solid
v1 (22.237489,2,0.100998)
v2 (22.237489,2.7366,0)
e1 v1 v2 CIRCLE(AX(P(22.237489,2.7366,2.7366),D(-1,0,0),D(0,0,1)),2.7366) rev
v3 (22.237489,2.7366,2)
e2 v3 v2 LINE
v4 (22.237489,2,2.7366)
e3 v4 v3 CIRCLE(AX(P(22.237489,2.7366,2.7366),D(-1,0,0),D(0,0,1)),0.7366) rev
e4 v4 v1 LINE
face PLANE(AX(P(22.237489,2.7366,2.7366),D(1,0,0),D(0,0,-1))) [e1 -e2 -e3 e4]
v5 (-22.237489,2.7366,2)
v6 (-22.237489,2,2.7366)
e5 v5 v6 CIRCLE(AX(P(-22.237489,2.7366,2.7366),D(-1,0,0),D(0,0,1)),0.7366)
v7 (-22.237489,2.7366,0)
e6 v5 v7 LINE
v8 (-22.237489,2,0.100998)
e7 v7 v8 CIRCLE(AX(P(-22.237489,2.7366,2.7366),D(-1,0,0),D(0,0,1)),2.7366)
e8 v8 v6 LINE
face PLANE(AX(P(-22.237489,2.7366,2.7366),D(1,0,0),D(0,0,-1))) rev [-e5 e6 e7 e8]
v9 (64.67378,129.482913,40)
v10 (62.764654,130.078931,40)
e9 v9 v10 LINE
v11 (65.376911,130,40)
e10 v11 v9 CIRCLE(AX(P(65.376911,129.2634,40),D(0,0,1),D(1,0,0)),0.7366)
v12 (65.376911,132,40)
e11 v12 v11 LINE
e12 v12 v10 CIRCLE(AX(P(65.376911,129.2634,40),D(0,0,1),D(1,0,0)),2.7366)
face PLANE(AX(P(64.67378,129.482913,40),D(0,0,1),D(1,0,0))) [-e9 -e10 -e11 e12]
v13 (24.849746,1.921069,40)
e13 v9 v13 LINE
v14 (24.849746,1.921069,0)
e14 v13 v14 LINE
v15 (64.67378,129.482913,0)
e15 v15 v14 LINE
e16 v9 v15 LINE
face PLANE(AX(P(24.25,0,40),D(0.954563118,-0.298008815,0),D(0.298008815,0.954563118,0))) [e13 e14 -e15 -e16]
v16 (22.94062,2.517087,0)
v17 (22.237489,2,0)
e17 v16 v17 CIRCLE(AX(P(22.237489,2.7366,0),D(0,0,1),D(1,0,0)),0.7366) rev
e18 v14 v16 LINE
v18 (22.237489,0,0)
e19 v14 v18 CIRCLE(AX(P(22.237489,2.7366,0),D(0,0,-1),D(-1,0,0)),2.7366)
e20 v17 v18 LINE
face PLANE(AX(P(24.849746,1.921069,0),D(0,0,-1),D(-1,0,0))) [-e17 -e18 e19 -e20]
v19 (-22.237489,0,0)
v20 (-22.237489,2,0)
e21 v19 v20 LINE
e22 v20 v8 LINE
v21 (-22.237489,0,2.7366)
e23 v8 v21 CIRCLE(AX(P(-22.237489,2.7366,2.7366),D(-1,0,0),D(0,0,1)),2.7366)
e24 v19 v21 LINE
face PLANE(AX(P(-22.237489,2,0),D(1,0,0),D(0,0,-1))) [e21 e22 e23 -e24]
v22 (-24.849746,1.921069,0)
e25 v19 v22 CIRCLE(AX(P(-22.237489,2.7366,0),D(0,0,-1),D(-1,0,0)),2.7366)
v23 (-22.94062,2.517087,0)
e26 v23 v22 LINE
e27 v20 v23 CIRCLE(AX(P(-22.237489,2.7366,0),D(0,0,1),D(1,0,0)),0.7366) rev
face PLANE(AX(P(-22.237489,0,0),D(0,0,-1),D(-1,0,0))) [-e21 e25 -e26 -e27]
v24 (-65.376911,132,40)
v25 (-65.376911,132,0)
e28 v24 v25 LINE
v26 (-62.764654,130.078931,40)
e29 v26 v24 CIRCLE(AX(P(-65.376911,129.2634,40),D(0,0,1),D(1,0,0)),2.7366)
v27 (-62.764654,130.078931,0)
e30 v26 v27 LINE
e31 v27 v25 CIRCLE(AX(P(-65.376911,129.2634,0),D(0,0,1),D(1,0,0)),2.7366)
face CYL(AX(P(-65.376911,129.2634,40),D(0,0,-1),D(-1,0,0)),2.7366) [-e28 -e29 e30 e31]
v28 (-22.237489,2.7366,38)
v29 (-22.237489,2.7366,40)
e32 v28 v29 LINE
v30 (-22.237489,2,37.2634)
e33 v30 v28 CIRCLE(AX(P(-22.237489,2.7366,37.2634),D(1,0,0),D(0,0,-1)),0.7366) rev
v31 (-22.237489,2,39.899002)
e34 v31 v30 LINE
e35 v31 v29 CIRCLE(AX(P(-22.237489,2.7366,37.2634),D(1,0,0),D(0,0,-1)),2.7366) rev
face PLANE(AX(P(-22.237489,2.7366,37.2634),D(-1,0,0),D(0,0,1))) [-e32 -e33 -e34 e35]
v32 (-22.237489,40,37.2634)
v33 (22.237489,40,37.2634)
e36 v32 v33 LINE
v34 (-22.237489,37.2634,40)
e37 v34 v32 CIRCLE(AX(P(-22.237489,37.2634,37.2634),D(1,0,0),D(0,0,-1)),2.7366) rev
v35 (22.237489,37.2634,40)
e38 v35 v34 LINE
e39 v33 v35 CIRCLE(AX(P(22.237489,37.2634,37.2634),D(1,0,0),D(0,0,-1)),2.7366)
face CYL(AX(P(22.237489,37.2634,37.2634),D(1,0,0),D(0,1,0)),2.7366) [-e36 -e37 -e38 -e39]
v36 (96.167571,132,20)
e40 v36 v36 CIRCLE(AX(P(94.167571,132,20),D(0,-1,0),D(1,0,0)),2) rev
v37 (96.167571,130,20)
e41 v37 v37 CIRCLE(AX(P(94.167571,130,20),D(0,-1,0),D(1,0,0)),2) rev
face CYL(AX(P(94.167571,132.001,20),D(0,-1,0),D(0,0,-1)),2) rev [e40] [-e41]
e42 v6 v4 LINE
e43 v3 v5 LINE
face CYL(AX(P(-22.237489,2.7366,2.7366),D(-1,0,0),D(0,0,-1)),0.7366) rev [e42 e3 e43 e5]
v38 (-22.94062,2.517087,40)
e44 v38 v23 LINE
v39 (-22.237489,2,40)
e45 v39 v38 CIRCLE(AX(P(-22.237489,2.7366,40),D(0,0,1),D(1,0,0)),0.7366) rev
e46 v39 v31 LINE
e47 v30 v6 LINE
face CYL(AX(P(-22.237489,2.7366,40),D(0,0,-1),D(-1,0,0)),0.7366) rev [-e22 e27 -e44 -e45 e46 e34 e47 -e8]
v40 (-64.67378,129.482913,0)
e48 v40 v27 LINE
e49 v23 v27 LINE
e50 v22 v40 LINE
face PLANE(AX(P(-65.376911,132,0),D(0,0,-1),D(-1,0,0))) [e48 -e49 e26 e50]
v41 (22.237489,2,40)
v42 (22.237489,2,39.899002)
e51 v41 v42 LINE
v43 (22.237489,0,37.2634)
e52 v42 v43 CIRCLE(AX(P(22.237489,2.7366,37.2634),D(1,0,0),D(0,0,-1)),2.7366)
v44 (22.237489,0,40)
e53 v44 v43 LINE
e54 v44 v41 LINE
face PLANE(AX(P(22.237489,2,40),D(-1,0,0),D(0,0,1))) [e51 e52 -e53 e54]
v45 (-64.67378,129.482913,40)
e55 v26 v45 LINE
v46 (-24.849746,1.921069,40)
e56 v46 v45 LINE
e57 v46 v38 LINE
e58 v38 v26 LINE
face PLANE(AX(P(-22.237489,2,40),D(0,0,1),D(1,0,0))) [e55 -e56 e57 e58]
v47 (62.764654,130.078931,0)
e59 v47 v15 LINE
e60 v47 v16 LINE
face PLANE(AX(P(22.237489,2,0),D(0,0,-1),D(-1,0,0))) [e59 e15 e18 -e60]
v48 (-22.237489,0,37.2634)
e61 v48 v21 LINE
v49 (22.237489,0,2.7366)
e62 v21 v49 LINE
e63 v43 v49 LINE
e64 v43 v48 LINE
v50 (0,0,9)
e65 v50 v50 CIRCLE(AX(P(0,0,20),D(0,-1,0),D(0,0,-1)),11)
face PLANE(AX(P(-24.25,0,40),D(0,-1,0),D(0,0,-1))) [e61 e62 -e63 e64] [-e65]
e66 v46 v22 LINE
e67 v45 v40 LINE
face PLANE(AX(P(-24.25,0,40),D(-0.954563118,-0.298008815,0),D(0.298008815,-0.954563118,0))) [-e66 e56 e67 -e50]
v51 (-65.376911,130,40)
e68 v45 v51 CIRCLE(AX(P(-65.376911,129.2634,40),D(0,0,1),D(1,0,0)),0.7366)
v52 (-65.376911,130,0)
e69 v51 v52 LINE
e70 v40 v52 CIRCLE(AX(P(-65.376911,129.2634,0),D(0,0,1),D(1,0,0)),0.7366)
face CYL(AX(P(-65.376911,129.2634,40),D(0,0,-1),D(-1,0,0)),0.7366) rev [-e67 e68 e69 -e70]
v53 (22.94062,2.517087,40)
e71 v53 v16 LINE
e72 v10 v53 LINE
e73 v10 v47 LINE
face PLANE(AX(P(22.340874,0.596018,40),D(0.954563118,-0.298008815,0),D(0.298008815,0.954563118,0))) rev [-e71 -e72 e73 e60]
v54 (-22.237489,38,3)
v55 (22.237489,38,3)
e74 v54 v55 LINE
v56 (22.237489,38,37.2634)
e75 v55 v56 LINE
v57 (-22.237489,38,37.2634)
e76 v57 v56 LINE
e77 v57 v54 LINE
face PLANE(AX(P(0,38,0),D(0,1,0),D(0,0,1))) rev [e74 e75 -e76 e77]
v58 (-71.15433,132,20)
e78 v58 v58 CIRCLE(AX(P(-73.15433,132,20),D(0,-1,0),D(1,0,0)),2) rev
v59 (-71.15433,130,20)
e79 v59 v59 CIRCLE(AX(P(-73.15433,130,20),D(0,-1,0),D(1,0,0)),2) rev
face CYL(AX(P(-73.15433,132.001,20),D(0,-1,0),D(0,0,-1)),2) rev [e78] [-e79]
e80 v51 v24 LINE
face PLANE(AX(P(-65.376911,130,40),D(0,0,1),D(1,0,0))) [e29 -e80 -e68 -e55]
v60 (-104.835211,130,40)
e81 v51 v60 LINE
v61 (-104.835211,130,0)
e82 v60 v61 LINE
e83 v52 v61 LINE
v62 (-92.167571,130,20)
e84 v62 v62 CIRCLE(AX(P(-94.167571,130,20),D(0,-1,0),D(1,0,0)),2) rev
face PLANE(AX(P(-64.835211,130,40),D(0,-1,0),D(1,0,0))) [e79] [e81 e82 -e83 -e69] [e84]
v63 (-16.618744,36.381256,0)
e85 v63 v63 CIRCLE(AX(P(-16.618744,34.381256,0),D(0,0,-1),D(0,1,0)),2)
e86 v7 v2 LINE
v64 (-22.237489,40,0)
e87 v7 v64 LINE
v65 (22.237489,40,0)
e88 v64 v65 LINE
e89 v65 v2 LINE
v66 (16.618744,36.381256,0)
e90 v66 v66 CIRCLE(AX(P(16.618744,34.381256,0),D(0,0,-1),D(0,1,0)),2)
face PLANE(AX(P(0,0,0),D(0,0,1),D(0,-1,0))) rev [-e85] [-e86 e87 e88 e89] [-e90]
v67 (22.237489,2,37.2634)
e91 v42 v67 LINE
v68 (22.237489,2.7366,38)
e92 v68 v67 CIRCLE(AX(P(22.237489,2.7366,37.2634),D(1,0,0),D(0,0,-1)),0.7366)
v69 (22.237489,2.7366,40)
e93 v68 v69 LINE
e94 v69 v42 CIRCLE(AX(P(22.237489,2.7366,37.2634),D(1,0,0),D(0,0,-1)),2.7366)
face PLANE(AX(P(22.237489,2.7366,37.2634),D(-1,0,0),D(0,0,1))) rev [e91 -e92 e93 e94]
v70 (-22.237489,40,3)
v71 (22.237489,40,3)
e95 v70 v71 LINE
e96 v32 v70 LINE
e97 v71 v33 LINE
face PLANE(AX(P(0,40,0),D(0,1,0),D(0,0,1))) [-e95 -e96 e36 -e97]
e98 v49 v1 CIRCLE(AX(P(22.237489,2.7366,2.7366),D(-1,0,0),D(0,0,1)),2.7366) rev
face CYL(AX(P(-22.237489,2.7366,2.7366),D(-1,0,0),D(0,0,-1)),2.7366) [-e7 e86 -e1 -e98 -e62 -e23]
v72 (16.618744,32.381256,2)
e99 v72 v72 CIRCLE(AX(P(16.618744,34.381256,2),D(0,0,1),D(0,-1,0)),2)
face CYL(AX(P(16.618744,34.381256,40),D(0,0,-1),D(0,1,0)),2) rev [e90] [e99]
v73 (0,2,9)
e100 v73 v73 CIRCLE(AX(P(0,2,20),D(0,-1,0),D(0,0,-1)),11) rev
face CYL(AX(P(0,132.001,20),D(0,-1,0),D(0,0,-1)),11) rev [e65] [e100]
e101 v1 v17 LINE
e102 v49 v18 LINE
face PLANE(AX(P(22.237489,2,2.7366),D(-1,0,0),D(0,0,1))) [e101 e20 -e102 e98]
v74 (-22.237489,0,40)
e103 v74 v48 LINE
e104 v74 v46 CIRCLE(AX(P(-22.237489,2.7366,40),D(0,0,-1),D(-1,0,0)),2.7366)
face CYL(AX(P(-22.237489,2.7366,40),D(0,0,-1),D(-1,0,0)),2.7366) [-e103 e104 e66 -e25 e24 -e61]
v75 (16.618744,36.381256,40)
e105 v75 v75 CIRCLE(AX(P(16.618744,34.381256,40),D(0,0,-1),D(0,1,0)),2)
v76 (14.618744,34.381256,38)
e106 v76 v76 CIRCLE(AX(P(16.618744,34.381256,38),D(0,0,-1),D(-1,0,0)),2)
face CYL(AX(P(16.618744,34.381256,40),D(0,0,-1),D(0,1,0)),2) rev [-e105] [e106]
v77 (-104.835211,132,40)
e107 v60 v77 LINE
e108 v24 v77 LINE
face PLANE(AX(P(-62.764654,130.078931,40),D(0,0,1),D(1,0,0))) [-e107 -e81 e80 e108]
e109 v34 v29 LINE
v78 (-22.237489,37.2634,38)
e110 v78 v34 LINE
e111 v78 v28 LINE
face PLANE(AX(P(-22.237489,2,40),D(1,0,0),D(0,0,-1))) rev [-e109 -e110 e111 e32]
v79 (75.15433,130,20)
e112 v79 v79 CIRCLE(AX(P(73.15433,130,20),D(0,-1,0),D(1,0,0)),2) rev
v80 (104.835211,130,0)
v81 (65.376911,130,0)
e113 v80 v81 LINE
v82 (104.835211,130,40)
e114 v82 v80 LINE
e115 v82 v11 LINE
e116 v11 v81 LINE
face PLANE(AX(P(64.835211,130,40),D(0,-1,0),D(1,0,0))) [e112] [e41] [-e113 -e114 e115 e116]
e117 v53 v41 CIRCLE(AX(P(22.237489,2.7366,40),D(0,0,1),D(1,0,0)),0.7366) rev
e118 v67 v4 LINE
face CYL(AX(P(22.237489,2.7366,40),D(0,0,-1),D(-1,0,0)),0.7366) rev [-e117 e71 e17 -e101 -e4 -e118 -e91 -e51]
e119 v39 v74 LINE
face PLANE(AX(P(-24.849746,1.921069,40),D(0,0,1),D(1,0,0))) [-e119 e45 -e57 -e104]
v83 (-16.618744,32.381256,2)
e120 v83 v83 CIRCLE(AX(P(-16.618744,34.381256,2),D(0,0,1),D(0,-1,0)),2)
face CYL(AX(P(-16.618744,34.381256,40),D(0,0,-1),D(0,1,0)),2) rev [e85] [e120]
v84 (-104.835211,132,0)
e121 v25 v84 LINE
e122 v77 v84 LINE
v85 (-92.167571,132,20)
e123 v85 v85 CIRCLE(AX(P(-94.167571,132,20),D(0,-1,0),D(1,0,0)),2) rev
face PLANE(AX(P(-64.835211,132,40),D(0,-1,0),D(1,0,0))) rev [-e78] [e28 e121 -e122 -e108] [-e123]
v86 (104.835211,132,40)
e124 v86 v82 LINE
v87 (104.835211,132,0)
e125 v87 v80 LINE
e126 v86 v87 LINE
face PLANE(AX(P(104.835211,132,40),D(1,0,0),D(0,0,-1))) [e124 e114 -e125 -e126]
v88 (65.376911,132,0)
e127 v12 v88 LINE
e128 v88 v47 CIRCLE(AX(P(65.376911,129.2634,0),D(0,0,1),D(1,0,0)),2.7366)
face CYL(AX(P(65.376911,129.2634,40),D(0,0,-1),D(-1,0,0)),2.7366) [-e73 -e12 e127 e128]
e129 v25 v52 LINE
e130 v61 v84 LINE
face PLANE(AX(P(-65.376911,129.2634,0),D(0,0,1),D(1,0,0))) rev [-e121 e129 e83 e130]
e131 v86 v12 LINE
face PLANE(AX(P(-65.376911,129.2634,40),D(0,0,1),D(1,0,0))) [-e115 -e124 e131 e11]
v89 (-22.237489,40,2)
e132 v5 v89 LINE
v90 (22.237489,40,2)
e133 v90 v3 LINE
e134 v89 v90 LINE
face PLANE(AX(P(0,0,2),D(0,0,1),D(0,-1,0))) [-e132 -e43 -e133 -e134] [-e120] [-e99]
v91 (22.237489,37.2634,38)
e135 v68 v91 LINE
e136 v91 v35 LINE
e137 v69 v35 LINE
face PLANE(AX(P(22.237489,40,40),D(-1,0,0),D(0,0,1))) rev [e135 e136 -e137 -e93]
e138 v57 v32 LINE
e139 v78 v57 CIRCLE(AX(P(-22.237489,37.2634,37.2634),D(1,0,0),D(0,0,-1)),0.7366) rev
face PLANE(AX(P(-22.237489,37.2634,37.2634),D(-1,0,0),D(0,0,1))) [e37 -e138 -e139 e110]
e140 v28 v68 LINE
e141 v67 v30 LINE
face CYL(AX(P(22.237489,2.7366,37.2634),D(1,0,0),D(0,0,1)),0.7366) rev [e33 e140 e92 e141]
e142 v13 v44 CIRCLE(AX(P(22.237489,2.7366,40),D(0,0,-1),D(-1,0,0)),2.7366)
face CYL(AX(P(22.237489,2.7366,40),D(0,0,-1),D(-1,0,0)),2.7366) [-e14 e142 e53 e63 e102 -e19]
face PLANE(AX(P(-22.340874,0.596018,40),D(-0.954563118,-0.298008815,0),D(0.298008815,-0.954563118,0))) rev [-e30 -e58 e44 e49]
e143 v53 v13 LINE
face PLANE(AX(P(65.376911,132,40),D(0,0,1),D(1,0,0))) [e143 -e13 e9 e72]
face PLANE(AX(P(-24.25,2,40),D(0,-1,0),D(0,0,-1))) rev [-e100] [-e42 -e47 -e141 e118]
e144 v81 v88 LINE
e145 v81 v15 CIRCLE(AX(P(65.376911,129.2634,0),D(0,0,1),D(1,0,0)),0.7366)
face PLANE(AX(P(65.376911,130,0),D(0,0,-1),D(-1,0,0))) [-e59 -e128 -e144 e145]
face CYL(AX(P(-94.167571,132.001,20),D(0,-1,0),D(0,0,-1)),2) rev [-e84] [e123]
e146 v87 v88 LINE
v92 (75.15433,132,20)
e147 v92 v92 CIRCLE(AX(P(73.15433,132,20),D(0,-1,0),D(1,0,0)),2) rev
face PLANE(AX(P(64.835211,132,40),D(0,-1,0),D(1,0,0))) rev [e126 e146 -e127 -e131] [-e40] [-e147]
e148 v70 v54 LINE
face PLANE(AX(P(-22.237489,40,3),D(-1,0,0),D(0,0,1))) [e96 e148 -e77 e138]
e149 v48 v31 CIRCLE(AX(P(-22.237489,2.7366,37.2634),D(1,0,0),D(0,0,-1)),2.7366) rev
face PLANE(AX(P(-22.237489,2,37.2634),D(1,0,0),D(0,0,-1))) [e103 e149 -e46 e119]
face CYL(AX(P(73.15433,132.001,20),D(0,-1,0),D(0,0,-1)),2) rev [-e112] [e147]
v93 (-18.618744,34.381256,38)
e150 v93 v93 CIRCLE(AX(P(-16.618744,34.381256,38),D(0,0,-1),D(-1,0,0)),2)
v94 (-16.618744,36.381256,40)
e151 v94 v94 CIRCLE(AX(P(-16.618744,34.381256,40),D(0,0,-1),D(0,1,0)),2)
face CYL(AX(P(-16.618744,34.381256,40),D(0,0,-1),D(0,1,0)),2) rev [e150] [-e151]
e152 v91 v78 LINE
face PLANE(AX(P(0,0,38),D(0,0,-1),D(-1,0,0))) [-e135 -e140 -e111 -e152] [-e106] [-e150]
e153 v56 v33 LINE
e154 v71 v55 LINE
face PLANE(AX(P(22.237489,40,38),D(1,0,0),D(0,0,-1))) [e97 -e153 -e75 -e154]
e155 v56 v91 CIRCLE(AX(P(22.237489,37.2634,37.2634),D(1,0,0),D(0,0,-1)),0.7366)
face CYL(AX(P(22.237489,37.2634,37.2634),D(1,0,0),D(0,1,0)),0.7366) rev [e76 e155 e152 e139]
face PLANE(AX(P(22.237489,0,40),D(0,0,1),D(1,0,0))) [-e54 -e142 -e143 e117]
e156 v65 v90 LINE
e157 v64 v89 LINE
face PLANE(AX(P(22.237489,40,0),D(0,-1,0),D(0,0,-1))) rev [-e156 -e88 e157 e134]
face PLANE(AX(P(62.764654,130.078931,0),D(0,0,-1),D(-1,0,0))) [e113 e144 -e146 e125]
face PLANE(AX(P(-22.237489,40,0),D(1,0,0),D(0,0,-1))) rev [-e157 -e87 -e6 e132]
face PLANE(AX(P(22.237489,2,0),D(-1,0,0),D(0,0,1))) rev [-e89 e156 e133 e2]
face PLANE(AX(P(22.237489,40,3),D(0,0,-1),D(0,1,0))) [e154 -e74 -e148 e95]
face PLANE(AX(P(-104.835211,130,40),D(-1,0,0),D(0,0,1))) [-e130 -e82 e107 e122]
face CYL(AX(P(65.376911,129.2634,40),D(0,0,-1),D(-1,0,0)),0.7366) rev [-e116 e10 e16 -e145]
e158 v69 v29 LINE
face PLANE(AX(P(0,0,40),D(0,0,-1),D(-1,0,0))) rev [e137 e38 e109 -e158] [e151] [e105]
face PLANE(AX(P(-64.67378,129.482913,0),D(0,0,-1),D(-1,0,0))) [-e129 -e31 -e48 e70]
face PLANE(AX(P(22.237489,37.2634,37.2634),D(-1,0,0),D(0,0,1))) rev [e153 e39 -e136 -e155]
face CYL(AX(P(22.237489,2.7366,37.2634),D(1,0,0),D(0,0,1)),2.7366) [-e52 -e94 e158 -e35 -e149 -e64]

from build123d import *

# Parameters (mm, degrees)
BASE_FLANGE1_DEPTH           = 40
EDGE_FLANGE1_STRIP_W         = 9.4732
EDGE_FLANGE1_STRIP_H         = 2
EDGE_FLANGE1_STRIP_CUT_DEPTH = 44.47497737
EDGE_FLANGE1_DEPTH           = 44.47497737
EDGE_FLANGE2_STRIP_W         = 9.4732
EDGE_FLANGE2_STRIP_H         = 2
EDGE_FLANGE2_STRIP_CUT_DEPTH = 44.47497737
EDGE_FLANGE2_DEPTH           = 44.47497737
EDGE_FLANGE3_STRIP_W         = 9.4732
EDGE_FLANGE3_STRIP_H         = 2
EDGE_FLANGE3_STRIP_CUT_DEPTH = 44.47497737
EDGE_FLANGE3_DEPTH           = 44.47497737
CUT_EXTRUDE1_REACH           = 175.247
SKETCH28_R                   = 11
SKETCH28_R_2                 = 2
SKETCH29_R                   = 2
CUT_EXTRUDE2_DEPTH           = 174.246707232


# Sheet-metal steps are written as plain solids
with BuildPart() as part:
    # Sketch1 → Base-Flange1 (new body)
    with BuildSketch(Plane.XY):
        with BuildLine():
            Line((104.835211483, 130), (65.376911342, 130))
            ThreePointArc((65.376911342, 130), (64.940513549, 129.856810925), (64.67378015, 129.482913293))
            Line((64.67378015, 129.482913293), (24.849746113, 1.921069076))
            ThreePointArc((24.849746113, 1.921069076), (23.858784098, 0.531972879), (22.237488685, 0))
            Line((22.237488685, 0), (-22.237488685, 0))
            ThreePointArc((-22.237488685, 0), (-23.858784098, 0.531972879), (-24.849746113, 1.921069076))
            Line((-24.849746113, 1.921069076), (-64.67378015, 129.482913293))
            ThreePointArc((-64.67378015, 129.482913293), (-64.940513549, 129.856810925), (-65.376911342, 130))
            Line((-65.376911342, 130), (-104.835211483, 130))
            Line((-104.835211483, 130), (-104.835211483, 132))
            Line((-104.835211483, 132), (-65.376911342, 132))
            ThreePointArc((-65.376911342, 132), (-63.755615929, 131.468027121), (-62.764653914, 130.078930924))
            Line((-62.764653914, 130.078930924), (-22.940619877, 2.517086707))
            ThreePointArc((-22.940619877, 2.517086707), (-22.673886478, 2.143189075), (-22.237488685, 2))
            Line((-22.237488685, 2), (22.237488685, 2))
            ThreePointArc((22.237488685, 2), (22.673886478, 2.143189075), (22.940619877, 2.517086707))
            Line((22.940619877, 2.517086707), (62.764653914, 130.078930924))
            ThreePointArc((62.764653914, 130.078930924), (63.755615929, 131.468027121), (65.376911342, 132))
            Line((65.376911342, 132), (104.835211483, 132))
            Line((104.835211483, 132), (104.835211483, 130))
        make_face()
    extrude(amount=BASE_FLANGE1_DEPTH)

    # Edge-Flange1 strip (across the edge) → Edge-Flange1 strip cut (cut)
    with BuildSketch(Plane(origin=(22.237488685, 2, 0), x_dir=(0, 0, 1), z_dir=(-1, 0, 0))):
        with Locations((-2, -1)):
            Rectangle(EDGE_FLANGE1_STRIP_W, EDGE_FLANGE1_STRIP_H)
    extrude(amount=EDGE_FLANGE1_STRIP_CUT_DEPTH, mode=Mode.SUBTRACT)

    # Edge-Flange1 section (across the edge) → Edge-Flange1 (add)
    with BuildSketch(Plane(origin=(22.237488685, 2, 0), x_dir=(0, 0, 1), z_dir=(-1, 0, 0))):
        with BuildLine():
            Line((0, 0.7366), (0, 38))
            Line((0, 38), (2, 38))
            Line((2, 38), (2, 0.7366))
            ThreePointArc((2, 0.7366), (2.215745145, 0.215745145), (2.7366, 0))
            Line((2.7366, 0), (2.7366, -2))
            ThreePointArc((2.7366, -2), (0.801531583, -1.198468417), (0, 0.7366))
        make_face()
    extrude(amount=EDGE_FLANGE1_DEPTH)

    # Edge-Flange2 strip (across the edge) → Edge-Flange2 strip cut (cut)
    with BuildSketch(Plane(origin=(-22.237488685, 2, 40), x_dir=(0, 0, -1), z_dir=(1, 0, 0))):
        with Locations((-2, -1)):
            Rectangle(EDGE_FLANGE2_STRIP_W, EDGE_FLANGE2_STRIP_H)
    extrude(amount=EDGE_FLANGE2_STRIP_CUT_DEPTH, mode=Mode.SUBTRACT)

    # Edge-Flange2 section (across the edge) → Edge-Flange2 (add)
    with BuildSketch(Plane(origin=(-22.237488685, 2, 40), x_dir=(0, 0, -1), z_dir=(1, 0, 0))):
        with BuildLine():
            Line((0, 0.7366), (0, 38))
            Line((0, 38), (2, 38))
            Line((2, 38), (2, 0.7366))
            ThreePointArc((2, 0.7366), (2.215745145, 0.215745145), (2.7366, 0))
            Line((2.7366, 0), (2.7366, -2))
            ThreePointArc((2.7366, -2), (0.801531583, -1.198468417), (0, 0.7366))
        make_face()
    extrude(amount=EDGE_FLANGE2_DEPTH)

    # Edge-Flange3 strip (across the edge) → Edge-Flange3 strip cut (cut)
    with BuildSketch(Plane(origin=(-22.237488685, 40, 38), x_dir=(0, -1, 0), z_dir=(1, 0, 0))):
        with Locations((-2, -1)):
            Rectangle(EDGE_FLANGE3_STRIP_W, EDGE_FLANGE3_STRIP_H)
    extrude(amount=EDGE_FLANGE3_STRIP_CUT_DEPTH, mode=Mode.SUBTRACT)

    # Edge-Flange3 section (across the edge) → Edge-Flange3 (add)
    with BuildSketch(Plane(origin=(-22.237488685, 40, 38), x_dir=(0, -1, 0), z_dir=(1, 0, 0))):
        with BuildLine():
            Line((0, 0.7366), (0, 35))
            Line((0, 35), (2, 35))
            Line((2, 35), (2, 0.7366))
            ThreePointArc((2, 0.7366), (2.215745145, 0.215745145), (2.7366, 0))
            Line((2.7366, 0), (2.7366, -2))
            ThreePointArc((2.7366, -2), (0.801531583, -1.198468417), (0, 0.7366))
        make_face()
    extrude(amount=EDGE_FLANGE3_DEPTH)

    # Sketch28 → Cut-Extrude1 (cut, up to next)
    with BuildSketch(Plane.XZ, mode=Mode.PRIVATE) as cut_extrude1_sk1:
        with Locations(Location((0, 20, 0), (0, 0, 270))):
            Circle(SKETCH28_R)
    cut_extrude1_tool1 = extrude(cut_extrude1_sk1.sketch, amount=-CUT_EXTRUDE1_REACH, mode=Mode.PRIVATE) & part.part
    # Sketch28 → Cut-Extrude1 (cut, up to next)
    with BuildSketch(Plane.XZ, mode=Mode.PRIVATE) as cut_extrude1_sk2:
        with Locations((73.154329826, 20)):
            Circle(SKETCH28_R_2)
    cut_extrude1_tool2 = extrude(cut_extrude1_sk2.sketch, amount=-CUT_EXTRUDE1_REACH, mode=Mode.PRIVATE) & part.part
    # Sketch28 → Cut-Extrude1 (cut, up to next)
    with BuildSketch(Plane.XZ, mode=Mode.PRIVATE) as cut_extrude1_sk3:
        with Locations((94.167570852, 20)):
            Circle(SKETCH28_R_2)
    cut_extrude1_tool3 = extrude(cut_extrude1_sk3.sketch, amount=-CUT_EXTRUDE1_REACH, mode=Mode.PRIVATE) & part.part
    # Sketch28 → Cut-Extrude1 (cut, up to next)
    with BuildSketch(Plane.XZ, mode=Mode.PRIVATE) as cut_extrude1_sk4:
        with Locations((-94.167570852, 20)):
            Circle(SKETCH28_R_2)
    cut_extrude1_tool4 = extrude(cut_extrude1_sk4.sketch, amount=-CUT_EXTRUDE1_REACH, mode=Mode.PRIVATE) & part.part
    # Sketch28 → Cut-Extrude1 (cut, up to next)
    with BuildSketch(Plane.XZ, mode=Mode.PRIVATE) as cut_extrude1_sk5:
        with Locations((-73.154329826, 20)):
            Circle(SKETCH28_R_2)
    cut_extrude1_tool5 = extrude(cut_extrude1_sk5.sketch, amount=-CUT_EXTRUDE1_REACH, mode=Mode.PRIVATE) & part.part
    add(cut_extrude1_tool1.solids().sort_by_distance((0, 0, 20))[0], mode=Mode.SUBTRACT)
    add(cut_extrude1_tool2.solids().sort_by_distance((73.15433, 0, 20))[0], mode=Mode.SUBTRACT)
    add(cut_extrude1_tool3.solids().sort_by_distance((94.167571, 0, 20))[0], mode=Mode.SUBTRACT)
    add(cut_extrude1_tool4.solids().sort_by_distance((-94.167571, 0, 20))[0], mode=Mode.SUBTRACT)
    add(cut_extrude1_tool5.solids().sort_by_distance((-73.15433, 0, 20))[0], mode=Mode.SUBTRACT)

    # Sketch29 → Cut-Extrude2 (cut, through all)
    with BuildSketch(Plane(origin=(0, 0, 0), x_dir=(-1, 0, 0), z_dir=(0, 0, -1))):
        with Locations(Location((-16.618744342, 34.381255658, 0), (0, 0, 90))):
            Circle(SKETCH29_R)
        with Locations(Location((16.618744342, 34.381255658, 0), (0, 0, 90))):
            Circle(SKETCH29_R)
    extrude(amount=-CUT_EXTRUDE2_DEPTH, mode=Mode.SUBTRACT)


solid = part.part
